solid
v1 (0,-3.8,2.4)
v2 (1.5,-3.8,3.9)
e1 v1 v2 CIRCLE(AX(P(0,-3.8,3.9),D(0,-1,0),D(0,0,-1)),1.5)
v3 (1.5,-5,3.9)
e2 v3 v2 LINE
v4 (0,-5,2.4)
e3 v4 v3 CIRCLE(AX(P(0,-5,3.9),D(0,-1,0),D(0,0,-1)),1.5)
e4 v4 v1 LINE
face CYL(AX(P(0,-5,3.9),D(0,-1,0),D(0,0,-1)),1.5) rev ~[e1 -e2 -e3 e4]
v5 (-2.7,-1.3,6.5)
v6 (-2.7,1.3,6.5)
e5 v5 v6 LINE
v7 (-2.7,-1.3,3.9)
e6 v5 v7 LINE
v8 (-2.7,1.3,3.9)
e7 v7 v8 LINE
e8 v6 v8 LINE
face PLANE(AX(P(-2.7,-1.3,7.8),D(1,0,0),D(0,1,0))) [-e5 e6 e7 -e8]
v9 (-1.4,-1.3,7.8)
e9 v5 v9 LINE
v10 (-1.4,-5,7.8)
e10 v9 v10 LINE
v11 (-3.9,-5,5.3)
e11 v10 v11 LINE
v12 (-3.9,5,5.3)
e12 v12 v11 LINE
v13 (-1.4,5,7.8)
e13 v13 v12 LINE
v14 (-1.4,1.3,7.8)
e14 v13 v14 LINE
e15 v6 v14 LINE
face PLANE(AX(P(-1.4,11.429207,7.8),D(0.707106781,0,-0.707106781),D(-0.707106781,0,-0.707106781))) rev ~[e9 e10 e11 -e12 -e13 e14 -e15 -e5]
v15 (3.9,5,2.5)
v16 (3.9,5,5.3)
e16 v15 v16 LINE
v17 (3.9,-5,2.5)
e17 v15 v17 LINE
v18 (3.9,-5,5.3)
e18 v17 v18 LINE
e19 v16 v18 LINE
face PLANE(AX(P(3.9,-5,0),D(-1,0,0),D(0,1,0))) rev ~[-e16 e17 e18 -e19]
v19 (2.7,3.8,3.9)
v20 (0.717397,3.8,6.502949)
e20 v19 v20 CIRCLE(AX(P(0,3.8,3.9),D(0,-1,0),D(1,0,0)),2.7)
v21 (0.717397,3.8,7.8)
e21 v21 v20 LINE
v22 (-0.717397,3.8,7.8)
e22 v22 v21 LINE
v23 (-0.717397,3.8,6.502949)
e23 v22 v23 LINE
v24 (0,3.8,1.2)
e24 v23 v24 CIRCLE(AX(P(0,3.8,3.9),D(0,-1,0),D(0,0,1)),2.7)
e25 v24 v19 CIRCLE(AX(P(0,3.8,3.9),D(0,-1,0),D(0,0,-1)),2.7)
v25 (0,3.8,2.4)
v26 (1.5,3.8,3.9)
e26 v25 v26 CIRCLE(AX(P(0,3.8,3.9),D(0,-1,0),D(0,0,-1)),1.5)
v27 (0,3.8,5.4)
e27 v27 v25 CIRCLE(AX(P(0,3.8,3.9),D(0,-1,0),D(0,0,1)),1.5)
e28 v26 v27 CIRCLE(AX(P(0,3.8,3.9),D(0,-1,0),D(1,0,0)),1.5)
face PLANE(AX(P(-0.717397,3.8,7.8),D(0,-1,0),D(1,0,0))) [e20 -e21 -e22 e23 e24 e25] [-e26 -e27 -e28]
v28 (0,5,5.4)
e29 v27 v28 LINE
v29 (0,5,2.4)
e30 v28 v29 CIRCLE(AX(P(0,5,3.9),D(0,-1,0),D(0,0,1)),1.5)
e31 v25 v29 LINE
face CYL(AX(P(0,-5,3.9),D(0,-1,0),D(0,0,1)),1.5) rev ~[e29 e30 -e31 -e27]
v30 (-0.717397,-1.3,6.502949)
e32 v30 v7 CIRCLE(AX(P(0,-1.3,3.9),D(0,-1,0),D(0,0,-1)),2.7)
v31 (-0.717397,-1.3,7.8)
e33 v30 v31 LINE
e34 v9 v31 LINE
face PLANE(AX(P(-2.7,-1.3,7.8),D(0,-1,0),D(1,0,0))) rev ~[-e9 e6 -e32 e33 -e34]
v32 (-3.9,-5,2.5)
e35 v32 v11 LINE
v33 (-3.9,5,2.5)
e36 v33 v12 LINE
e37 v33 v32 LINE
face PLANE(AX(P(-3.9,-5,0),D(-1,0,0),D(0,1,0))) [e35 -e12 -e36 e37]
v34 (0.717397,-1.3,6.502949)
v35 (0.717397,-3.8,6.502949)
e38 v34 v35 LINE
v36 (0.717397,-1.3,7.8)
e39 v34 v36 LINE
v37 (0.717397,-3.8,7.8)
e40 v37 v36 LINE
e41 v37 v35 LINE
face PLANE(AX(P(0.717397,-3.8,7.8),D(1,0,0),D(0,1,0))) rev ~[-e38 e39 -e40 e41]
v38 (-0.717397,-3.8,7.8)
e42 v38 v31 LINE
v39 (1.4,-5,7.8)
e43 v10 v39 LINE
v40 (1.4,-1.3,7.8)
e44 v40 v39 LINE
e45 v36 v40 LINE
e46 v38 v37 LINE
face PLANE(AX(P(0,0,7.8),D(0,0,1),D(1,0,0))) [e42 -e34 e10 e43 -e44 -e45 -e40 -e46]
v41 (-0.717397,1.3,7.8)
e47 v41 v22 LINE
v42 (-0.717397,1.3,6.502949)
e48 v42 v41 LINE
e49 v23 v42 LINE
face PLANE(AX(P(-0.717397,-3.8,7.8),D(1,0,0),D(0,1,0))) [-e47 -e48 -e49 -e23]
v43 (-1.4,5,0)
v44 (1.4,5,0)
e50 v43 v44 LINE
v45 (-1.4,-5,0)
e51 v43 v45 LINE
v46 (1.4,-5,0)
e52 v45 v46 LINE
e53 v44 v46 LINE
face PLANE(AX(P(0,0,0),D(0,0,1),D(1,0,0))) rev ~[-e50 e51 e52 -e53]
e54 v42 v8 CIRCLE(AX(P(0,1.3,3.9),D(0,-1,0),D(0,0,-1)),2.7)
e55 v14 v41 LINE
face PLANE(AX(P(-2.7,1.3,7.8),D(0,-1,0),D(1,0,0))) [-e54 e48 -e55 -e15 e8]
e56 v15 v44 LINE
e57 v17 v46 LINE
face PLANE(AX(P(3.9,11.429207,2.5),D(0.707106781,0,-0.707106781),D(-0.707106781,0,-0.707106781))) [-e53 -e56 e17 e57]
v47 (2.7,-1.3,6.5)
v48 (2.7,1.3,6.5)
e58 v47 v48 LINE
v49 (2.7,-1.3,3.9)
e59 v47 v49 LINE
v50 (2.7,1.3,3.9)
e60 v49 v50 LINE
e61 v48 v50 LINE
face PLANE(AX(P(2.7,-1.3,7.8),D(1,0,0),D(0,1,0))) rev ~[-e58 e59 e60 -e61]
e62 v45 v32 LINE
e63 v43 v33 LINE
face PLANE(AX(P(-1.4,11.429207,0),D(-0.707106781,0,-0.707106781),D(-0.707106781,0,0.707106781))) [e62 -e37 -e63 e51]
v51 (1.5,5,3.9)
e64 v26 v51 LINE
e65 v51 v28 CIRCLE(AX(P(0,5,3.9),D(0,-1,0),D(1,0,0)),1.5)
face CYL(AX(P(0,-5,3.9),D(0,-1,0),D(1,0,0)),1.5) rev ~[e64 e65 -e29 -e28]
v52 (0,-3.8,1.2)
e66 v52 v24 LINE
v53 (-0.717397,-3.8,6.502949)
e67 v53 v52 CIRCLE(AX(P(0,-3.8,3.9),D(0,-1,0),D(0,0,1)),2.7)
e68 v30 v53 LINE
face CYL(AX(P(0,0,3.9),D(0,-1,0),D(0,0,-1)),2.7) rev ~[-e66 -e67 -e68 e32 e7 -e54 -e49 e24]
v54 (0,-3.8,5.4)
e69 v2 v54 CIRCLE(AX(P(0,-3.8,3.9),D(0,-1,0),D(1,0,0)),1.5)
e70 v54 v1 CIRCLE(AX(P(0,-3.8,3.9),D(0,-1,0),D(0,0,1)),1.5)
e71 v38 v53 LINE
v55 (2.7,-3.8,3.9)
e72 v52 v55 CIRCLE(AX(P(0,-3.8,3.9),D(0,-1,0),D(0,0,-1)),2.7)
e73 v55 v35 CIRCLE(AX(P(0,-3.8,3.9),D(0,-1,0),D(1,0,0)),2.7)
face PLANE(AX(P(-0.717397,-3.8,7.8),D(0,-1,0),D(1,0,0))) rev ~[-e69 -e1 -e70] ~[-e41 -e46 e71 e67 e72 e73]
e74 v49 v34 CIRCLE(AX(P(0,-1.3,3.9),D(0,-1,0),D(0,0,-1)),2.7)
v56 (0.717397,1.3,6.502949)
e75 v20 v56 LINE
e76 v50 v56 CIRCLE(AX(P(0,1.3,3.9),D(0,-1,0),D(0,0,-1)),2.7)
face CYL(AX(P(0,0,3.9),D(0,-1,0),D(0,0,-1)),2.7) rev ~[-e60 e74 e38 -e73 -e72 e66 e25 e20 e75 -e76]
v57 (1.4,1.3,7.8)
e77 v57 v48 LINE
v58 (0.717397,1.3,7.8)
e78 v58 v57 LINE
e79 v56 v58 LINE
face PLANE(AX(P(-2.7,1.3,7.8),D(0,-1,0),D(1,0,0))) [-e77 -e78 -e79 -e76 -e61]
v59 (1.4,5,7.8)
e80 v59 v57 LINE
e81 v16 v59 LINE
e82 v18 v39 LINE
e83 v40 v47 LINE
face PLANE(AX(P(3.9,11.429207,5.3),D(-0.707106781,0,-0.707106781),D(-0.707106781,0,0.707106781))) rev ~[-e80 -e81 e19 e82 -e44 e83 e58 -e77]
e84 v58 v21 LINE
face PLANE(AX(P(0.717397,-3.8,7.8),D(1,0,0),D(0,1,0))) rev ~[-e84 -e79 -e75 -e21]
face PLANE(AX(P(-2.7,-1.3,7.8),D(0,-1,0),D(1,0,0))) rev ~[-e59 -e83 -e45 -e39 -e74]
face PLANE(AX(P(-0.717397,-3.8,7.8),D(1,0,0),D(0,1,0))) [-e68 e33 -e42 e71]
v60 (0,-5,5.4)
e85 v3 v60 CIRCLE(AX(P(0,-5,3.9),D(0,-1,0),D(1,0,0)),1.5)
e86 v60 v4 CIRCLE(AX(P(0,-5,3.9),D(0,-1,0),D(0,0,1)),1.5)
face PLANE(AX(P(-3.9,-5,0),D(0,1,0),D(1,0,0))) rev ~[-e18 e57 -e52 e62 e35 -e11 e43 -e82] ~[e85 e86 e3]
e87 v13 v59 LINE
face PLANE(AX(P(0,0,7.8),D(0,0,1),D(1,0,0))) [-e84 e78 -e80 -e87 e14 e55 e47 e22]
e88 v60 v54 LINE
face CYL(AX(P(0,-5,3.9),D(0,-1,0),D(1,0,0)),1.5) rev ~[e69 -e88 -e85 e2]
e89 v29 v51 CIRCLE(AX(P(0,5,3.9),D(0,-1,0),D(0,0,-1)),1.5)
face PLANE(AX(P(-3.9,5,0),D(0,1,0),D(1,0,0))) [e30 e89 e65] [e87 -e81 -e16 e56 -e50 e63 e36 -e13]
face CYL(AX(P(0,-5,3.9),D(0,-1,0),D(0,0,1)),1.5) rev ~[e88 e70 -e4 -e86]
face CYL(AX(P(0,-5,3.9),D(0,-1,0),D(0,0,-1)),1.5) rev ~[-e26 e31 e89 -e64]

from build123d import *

# Parameters (mm, degrees)
F3_W          = 7.8
F3_H          = 10
F3_W_2        = 5.4
F3_H_2        = 2.6
F4_DEPTH      = 7.8
F7_DEPTH      = 3.8
F7_DEPTH_BACK = 3.8
F8_W          = 5.4
F8_H          = 2.6
F9_DEPTH      = 3.9
F10_W         = 1.4347932888
F10_H         = 7.6
F11_DEPTH     = 3.9
F13_DEPTH     = 10.001
F14_T1_DEPTH  = 22.8584149398


# Not quite as in the source:
# - a fillet or chamfer that OpenCascade refuses, or shapes differently, is made with other operations: its cross-section is extruded or revolved along the edge and cut away or added


with BuildPart() as f4:
    # F3 (on Top) → F4 (new body)
    with BuildSketch(Plane.XY):
        Rectangle(F3_W, F3_H)
        Rectangle(F3_W_2, F3_H_2, mode=Mode.SUBTRACT)
        Rectangle(F3_W_2, F3_H_2)
    extrude(amount=F4_DEPTH)

    # F6 (on offset) → F7 (cut, two sides)
    with BuildSketch(Plane.XZ) as f7_sk:
        with BuildLine():
            ThreePointArc((0, 1.2), (1.9091883092, 1.9908116908), (2.7, 3.9))
            ThreePointArc((2.7, 3.9), (1.9091883092, 5.8091883092), (0, 6.6))
            Line((0, 6.6), (0, 3.9))
            Line((0, 3.9), (0, 1.2))
        make_face()
        with BuildLine():
            Line((0, 3.9), (0, 6.6))
            ThreePointArc((0, 6.6), (-2.7, 3.9), (0, 1.2))
            Line((0, 1.2), (0, 3.9))
        make_face()
    extrude(amount=-F7_DEPTH, mode=Mode.SUBTRACT)
    extrude(f7_sk.sketch, amount=F7_DEPTH_BACK, mode=Mode.SUBTRACT)

    # F8 (on face) → F9 (cut)
    with BuildSketch(Plane.XY.offset(7.8)):
        Rectangle(F8_W, F8_H)
    extrude(amount=-F9_DEPTH, mode=Mode.SUBTRACT)

    # F10 (on face) → F11 (cut)
    with BuildSketch(Plane.XY.offset(7.8)):
        Rectangle(F10_W, F10_H)
    extrude(amount=-F11_DEPTH, mode=Mode.SUBTRACT)

    # F12 (on face) → F13 (cut, through all)
    with BuildSketch(Plane.XZ.offset(5)):
        with BuildLine():
            ThreePointArc((0, 2.4), (1.0606601718, 2.8393398282), (1.5, 3.9))
            ThreePointArc((1.5, 3.9), (1.0606601718, 4.9606601718), (0, 5.4))
            Line((0, 5.4), (0, 3.9))
            Line((0, 3.9), (0, 2.4))
        make_face()
        with BuildLine():
            Line((0, 3.9), (0, 5.4))
            ThreePointArc((0, 5.4), (-1.5, 3.9), (0, 2.4))
            Line((0, 2.4), (0, 3.9))
        make_face()
    extrude(amount=-F13_DEPTH, mode=Mode.SUBTRACT)

    # F14: chamfer of 2.5 on 4 edges, made by hand

    # F14_s2 → F14_t1 (cut)
    with BuildSketch(Plane.XZ.offset(-11.4292074699)):
        Polygon((-1.4, 7.8), (-3.9, 5.3), (-3.9, 7.8), align=None)
        Polygon((-1.4, 0), (-3.9, 2.5), (-3.9, 0), align=None)
        Polygon((3.9, 2.5), (1.4, 0), (3.9, 0), align=None)
        Polygon((3.9, 5.3), (1.4, 7.8), (3.9, 7.8), align=None)
    extrude(amount=F14_T1_DEPTH, mode=Mode.SUBTRACT)


solid = f4.part
